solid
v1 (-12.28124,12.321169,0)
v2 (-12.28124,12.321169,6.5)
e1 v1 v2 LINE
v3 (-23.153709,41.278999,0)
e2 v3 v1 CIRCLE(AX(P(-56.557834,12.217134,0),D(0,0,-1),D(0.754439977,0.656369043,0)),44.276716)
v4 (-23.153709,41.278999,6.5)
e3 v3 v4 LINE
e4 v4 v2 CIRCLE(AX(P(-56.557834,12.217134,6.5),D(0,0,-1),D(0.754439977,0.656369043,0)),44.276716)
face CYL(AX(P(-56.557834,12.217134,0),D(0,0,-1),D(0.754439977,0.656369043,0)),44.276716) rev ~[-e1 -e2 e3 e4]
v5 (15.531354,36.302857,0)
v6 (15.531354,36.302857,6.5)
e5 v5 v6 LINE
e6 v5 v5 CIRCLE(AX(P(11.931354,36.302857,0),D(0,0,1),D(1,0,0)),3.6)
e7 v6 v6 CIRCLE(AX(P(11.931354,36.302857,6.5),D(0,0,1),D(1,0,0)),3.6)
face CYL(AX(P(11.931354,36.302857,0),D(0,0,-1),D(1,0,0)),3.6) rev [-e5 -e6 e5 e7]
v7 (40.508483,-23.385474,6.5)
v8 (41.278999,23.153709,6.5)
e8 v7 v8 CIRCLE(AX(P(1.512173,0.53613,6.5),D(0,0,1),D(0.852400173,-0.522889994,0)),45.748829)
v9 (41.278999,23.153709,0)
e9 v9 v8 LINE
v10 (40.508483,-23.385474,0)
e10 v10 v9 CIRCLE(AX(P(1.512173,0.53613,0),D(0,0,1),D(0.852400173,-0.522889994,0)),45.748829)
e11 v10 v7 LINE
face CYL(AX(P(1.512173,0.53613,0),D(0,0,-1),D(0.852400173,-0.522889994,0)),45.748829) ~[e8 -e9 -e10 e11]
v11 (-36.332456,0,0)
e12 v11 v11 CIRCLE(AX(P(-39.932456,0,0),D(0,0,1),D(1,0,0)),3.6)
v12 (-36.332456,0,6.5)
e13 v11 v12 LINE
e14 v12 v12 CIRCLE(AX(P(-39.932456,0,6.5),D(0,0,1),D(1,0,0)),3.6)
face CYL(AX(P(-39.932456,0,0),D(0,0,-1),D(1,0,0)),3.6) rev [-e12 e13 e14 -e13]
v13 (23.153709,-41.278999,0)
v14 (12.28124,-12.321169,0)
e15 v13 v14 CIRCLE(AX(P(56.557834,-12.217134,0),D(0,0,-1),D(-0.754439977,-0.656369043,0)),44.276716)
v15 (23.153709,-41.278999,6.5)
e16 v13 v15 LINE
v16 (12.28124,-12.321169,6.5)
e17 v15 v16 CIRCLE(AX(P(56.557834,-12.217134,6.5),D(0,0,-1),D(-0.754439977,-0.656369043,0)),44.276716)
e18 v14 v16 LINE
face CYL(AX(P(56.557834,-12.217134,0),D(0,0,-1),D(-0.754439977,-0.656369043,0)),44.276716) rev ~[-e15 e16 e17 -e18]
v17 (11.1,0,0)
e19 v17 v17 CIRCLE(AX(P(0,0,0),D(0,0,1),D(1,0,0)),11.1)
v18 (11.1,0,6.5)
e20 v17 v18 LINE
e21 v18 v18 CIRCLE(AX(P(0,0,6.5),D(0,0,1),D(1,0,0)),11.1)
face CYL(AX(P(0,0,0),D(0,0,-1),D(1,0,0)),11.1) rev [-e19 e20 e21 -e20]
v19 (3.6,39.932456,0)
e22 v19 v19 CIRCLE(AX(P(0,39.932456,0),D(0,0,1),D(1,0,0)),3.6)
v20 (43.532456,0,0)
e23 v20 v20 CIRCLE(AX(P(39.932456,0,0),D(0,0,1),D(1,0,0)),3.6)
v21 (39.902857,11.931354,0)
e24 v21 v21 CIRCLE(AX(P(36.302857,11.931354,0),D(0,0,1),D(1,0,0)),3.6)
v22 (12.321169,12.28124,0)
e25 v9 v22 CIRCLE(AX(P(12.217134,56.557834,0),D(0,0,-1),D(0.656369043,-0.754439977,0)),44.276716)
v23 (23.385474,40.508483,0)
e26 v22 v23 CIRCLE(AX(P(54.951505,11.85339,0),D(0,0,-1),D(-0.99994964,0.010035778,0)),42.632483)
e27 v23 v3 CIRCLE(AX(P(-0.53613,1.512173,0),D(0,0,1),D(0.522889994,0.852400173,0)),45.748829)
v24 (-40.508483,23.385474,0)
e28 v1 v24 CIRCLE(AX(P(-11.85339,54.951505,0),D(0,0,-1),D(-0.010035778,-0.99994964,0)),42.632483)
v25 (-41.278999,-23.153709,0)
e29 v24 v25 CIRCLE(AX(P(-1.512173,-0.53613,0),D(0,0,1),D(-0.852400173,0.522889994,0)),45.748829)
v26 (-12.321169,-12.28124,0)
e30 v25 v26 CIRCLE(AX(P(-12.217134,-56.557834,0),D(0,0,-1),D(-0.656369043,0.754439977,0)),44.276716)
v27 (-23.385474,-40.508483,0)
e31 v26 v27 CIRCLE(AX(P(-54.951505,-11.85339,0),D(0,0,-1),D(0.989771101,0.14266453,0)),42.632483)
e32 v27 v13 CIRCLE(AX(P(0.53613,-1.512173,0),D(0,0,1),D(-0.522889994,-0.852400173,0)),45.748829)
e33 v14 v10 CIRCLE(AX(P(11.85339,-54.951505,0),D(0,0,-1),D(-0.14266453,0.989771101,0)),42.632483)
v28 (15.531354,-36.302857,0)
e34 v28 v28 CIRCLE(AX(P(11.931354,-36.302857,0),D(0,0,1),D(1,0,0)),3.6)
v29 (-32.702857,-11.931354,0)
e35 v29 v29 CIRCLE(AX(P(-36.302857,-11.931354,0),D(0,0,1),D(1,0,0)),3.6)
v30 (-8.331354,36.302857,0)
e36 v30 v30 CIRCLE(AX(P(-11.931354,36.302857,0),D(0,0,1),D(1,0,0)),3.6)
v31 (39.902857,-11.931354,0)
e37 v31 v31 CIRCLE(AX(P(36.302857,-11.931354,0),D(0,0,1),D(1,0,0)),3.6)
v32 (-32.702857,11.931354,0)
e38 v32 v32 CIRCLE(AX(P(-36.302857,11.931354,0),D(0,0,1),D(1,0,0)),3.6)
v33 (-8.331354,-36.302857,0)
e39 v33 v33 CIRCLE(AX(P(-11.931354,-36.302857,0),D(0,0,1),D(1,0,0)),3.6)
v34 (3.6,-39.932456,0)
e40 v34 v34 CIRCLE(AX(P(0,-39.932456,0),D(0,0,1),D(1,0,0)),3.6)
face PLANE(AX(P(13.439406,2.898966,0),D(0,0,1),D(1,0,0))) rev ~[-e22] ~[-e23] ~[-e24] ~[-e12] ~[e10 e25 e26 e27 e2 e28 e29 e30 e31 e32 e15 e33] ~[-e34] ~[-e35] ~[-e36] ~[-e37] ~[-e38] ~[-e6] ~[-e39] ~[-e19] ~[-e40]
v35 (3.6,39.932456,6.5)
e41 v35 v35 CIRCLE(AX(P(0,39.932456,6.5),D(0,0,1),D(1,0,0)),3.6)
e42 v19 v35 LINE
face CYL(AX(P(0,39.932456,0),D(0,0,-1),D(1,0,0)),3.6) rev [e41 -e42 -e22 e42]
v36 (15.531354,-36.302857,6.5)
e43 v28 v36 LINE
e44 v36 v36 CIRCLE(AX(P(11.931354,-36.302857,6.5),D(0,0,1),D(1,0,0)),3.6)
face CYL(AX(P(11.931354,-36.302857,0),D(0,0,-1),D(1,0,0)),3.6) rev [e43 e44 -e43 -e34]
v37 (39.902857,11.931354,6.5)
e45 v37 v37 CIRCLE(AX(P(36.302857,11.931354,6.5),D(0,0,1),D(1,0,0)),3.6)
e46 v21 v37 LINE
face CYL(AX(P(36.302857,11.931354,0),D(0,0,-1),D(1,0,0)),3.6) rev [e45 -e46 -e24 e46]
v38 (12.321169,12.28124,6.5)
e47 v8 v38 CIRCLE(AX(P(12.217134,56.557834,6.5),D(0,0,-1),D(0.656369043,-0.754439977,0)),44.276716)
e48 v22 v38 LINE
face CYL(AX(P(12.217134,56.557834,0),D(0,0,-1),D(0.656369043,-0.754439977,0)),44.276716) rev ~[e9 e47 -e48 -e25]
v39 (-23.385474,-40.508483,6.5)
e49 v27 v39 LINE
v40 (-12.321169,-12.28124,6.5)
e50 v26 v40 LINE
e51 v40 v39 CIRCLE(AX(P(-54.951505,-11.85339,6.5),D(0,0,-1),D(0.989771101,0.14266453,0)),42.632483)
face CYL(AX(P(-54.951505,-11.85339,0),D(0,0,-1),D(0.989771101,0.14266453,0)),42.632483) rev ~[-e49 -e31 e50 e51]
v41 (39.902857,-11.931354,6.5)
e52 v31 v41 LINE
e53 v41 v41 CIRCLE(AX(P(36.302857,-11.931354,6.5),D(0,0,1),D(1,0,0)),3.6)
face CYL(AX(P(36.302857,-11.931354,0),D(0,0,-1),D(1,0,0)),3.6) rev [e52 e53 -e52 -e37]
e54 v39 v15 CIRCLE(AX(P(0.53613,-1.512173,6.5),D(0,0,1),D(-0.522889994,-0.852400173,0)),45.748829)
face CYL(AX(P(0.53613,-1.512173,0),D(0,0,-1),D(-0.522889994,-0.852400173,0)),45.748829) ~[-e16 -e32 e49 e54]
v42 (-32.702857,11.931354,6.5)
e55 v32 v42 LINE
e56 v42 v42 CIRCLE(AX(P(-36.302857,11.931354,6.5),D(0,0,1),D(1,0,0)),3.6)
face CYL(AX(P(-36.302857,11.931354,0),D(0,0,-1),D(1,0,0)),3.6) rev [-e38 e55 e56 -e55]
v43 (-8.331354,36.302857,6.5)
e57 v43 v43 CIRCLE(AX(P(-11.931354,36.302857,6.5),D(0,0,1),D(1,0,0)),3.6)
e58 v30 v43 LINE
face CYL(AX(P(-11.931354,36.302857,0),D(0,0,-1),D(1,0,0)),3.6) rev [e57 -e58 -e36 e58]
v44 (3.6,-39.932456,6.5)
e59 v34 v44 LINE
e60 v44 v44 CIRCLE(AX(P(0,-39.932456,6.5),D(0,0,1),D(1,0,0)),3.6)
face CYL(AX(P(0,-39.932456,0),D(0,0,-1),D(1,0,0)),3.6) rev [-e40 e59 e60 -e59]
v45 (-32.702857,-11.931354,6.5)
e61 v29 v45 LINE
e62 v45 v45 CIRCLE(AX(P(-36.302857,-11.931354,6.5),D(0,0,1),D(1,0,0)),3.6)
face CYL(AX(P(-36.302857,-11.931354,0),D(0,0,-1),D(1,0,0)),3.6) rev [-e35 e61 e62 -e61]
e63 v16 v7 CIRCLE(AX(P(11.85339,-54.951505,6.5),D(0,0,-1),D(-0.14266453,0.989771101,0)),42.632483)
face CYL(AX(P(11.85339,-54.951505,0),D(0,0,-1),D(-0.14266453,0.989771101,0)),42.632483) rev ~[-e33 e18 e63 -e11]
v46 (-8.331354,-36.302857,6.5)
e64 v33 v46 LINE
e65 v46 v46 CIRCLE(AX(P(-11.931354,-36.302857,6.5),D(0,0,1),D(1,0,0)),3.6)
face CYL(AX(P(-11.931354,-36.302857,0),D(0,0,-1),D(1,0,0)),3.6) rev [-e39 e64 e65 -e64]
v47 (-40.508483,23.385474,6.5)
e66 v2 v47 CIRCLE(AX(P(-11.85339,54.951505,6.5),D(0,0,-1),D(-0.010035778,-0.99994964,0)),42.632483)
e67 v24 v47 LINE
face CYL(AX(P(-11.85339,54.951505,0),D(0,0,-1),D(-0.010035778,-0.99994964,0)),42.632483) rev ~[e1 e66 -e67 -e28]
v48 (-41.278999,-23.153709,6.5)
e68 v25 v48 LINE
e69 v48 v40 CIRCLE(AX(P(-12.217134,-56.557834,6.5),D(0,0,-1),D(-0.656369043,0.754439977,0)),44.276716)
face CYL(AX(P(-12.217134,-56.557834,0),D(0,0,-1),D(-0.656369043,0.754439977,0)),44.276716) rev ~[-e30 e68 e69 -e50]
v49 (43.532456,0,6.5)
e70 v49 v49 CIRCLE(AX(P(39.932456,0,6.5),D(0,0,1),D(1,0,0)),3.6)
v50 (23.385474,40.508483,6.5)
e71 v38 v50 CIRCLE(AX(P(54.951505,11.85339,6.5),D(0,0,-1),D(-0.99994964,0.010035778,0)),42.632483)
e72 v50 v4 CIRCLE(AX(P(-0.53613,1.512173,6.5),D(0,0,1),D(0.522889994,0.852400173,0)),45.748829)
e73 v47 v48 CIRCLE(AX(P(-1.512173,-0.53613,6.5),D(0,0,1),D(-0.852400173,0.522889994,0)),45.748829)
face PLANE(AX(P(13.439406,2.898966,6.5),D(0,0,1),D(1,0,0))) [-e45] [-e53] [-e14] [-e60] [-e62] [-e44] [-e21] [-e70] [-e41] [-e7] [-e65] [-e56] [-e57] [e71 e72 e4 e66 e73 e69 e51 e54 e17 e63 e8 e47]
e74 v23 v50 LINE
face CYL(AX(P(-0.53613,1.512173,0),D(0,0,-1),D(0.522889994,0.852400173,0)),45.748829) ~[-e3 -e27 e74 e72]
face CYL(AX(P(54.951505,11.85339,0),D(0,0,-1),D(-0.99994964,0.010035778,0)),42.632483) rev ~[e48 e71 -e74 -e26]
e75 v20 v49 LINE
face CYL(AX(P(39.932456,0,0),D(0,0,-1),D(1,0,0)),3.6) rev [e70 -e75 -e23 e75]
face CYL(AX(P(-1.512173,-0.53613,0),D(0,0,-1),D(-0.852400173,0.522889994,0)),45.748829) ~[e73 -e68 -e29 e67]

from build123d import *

# Parameters (mm, degrees)
F0_R     = 3.6
F0_R_2   = 11.1
F1_DEPTH = 6.5


with BuildPart() as f1:
    # F0 (on Top) → F1 (new body)
    with BuildSketch(Plane.XY):
        with BuildLine():
            ThreePointArc((12.7551052803, 5.7712467707), (13.2775282625, 2.8640474895), (14, 0))
            ThreePointArc((14, 0), (13.6852379213, 2.951993062), (12.7551052803, 5.7712467707))
        make_face()
        with BuildLine():
            ThreePointArc((12.7551052803, 5.7712467707), (13.6852379213, 2.951993062), (14, 0))
            ThreePointArc((14, 0), (13.6843771554, -2.9559806947), (12.7517397332, -5.7786792415))
            ThreePointArc((12.7517397332, -5.7786792415), (12.3951684194, -9.0411992807), (12.2812401035, -12.3211688608))
            ThreePointArc((12.2812401035, -12.3211688608), (27.4116387343, -15.2593204889), (40.5084826052, -23.3854744583))
            ThreePointArc((40.5084826052, -23.3854744583), (47.2547330266, -0.2211970993), (41.2789992988, 23.1537092477))
            ThreePointArc((41.2789992988, 23.1537092477), (27.7803945414, 15.1065071257), (12.3211688608, 12.2812401035))
            ThreePointArc((12.3211688608, 12.2812401035), (12.4134187433, 9.0179300915), (12.7551052803, 5.7712467707))
        make_face()
        with Locations((36.3028572677, -11.9313535626)):
            Circle(F0_R, mode=Mode.SUBTRACT)
        with Locations((39.9324558712, 0)):
            Circle(F0_R, mode=Mode.SUBTRACT)
        with Locations((36.3028572677, 11.9313535626)):
            Circle(F0_R, mode=Mode.SUBTRACT)
        with BuildLine():
            ThreePointArc((12.7517397332, -5.7786792415), (13.2793138092, -2.8684824171), (14, 0))
            ThreePointArc((14, 0), (13.2775282625, 2.8640474895), (12.7551052803, 5.7712467707))
            ThreePointArc((12.7551052803, 5.7712467707), (9.9023791422, 9.8966098905), (5.7786792415, 12.7517397332))
            ThreePointArc((5.7786792415, 12.7517397332), (2.8684824171, 13.2793138092), (0, 14))
            ThreePointArc((0, 14), (-2.8640474895, 13.2775282625), (-5.7712467707, 12.7551052803))
            ThreePointArc((-5.7712467707, 12.7551052803), (-9.8966098905, 9.9023791422), (-12.7517397332, 5.7786792415))
            ThreePointArc((-12.7517397332, 5.7786792415), (-13.2793138092, 2.8684824171), (-14, 0))
            ThreePointArc((-14, 0), (-13.2775282625, -2.8640474895), (-12.7551052803, -5.7712467707))
            ThreePointArc((-12.7551052803, -5.7712467707), (-9.9023791422, -9.8966098905), (-5.7786792415, -12.7517397332))
            ThreePointArc((-5.7786792415, -12.7517397332), (-2.8684824171, -13.2793138092), (0, -14))
            ThreePointArc((0, -14), (2.8640474895, -13.2775282625), (5.7712467707, -12.7551052803))
            ThreePointArc((5.7712467707, -12.7551052803), (9.8966098905, -9.9023791422), (12.7517397332, -5.7786792415))
        make_face()
        Circle(F0_R_2, mode=Mode.SUBTRACT)
        with BuildLine():
            ThreePointArc((12.7517397332, -5.7786792415), (13.6843771554, -2.9559806947), (14, 0))
            ThreePointArc((14, 0), (13.2793138092, -2.8684824171), (12.7517397332, -5.7786792415))
        make_face()
        with BuildLine():
            ThreePointArc((5.7786792415, 12.7517397332), (9.9023791422, 9.8966098905), (12.7551052803, 5.7712467707))
            ThreePointArc((12.7551052803, 5.7712467707), (12.4134187433, 9.0179300915), (12.3211688608, 12.2812401035))
            ThreePointArc((12.3211688608, 12.2812401035), (9.0411992807, 12.3951684194), (5.7786792415, 12.7517397332))
        make_face()
        with BuildLine():
            ThreePointArc((12.2812401035, -12.3211688608), (12.3951684194, -9.0411992807), (12.7517397332, -5.7786792415))
            ThreePointArc((12.7517397332, -5.7786792415), (9.8966098905, -9.9023791422), (5.7712467707, -12.7551052803))
            ThreePointArc((5.7712467707, -12.7551052803), (9.0179300915, -12.4134187433), (12.2812401035, -12.3211688608))
        make_face()
        with BuildLine():
            ThreePointArc((0, 14), (2.8684824171, 13.2793138092), (5.7786792415, 12.7517397332))
            ThreePointArc((5.7786792415, 12.7517397332), (2.9559806947, 13.6843771554), (0, 14))
        make_face()
        with BuildLine():
            ThreePointArc((0, 14), (2.9559806947, 13.6843771554), (5.7786792415, 12.7517397332))
            ThreePointArc((5.7786792415, 12.7517397332), (9.0411992807, 12.3951684194), (12.3211688608, 12.2812401035))
            ThreePointArc((12.3211688608, 12.2812401035), (15.2593204889, 27.4116387343), (23.3854744583, 40.5084826052))
            ThreePointArc((23.3854744583, 40.5084826052), (0.2211970993, 47.2547330266), (-23.1537092477, 41.2789992988))
            ThreePointArc((-23.1537092477, 41.2789992988), (-15.1065071257, 27.7803945414), (-12.2812401035, 12.3211688608))
            ThreePointArc((-12.2812401035, 12.3211688608), (-9.0179300915, 12.4134187433), (-5.7712467707, 12.7551052803))
            ThreePointArc((-5.7712467707, 12.7551052803), (-2.951993062, 13.6852379213), (0, 14))
        make_face()
        with Locations((-11.9313535626, 36.3028572677)):
            Circle(F0_R, mode=Mode.SUBTRACT)
        with Locations((0, 39.9324558712)):
            Circle(F0_R, mode=Mode.SUBTRACT)
        with Locations((11.9313535626, 36.3028572677)):
            Circle(F0_R, mode=Mode.SUBTRACT)
        with BuildLine():
            ThreePointArc((12.2812401035, -12.3211688608), (9.0179300915, -12.4134187433), (5.7712467707, -12.7551052803))
            ThreePointArc((5.7712467707, -12.7551052803), (2.951993062, -13.6852379213), (0, -14))
            ThreePointArc((0, -14), (-2.9559806947, -13.6843771554), (-5.7786792415, -12.7517397332))
            ThreePointArc((-5.7786792415, -12.7517397332), (-9.0411992807, -12.3951684194), (-12.3211688608, -12.2812401035))
            ThreePointArc((-12.3211688608, -12.2812401035), (-15.2593204889, -27.4116387343), (-23.3854744583, -40.5084826052))
            ThreePointArc((-23.3854744583, -40.5084826052), (-0.2211970993, -47.2547330266), (23.1537092477, -41.2789992988))
            ThreePointArc((23.1537092477, -41.2789992988), (15.1065071257, -27.7803945414), (12.2812401035, -12.3211688608))
        make_face()
        with Locations((-11.9313535626, -36.3028572677)):
            Circle(F0_R, mode=Mode.SUBTRACT)
        with Locations((0, -39.9324558712)):
            Circle(F0_R, mode=Mode.SUBTRACT)
        with Locations((11.9313535626, -36.3028572677)):
            Circle(F0_R, mode=Mode.SUBTRACT)
        with BuildLine():
            ThreePointArc((0, -14), (2.951993062, -13.6852379213), (5.7712467707, -12.7551052803))
            ThreePointArc((5.7712467707, -12.7551052803), (2.8640474895, -13.2775282625), (0, -14))
        make_face()
        with BuildLine():
            ThreePointArc((-5.7712467707, 12.7551052803), (-2.8640474895, 13.2775282625), (0, 14))
            ThreePointArc((0, 14), (-2.951993062, 13.6852379213), (-5.7712467707, 12.7551052803))
        make_face()
        with BuildLine():
            ThreePointArc((-5.7786792415, -12.7517397332), (-2.9559806947, -13.6843771554), (0, -14))
            ThreePointArc((0, -14), (-2.8684824171, -13.2793138092), (-5.7786792415, -12.7517397332))
        make_face()
        with BuildLine():
            ThreePointArc((-12.7517397332, 5.7786792415), (-9.8966098905, 9.9023791422), (-5.7712467707, 12.7551052803))
            ThreePointArc((-5.7712467707, 12.7551052803), (-9.0179300915, 12.4134187433), (-12.2812401035, 12.3211688608))
            ThreePointArc((-12.2812401035, 12.3211688608), (-12.3951684194, 9.0411992807), (-12.7517397332, 5.7786792415))
        make_face()
        with BuildLine():
            ThreePointArc((-12.3211688608, -12.2812401035), (-9.0411992807, -12.3951684194), (-5.7786792415, -12.7517397332))
            ThreePointArc((-5.7786792415, -12.7517397332), (-9.9023791422, -9.8966098905), (-12.7551052803, -5.7712467707))
            ThreePointArc((-12.7551052803, -5.7712467707), (-12.4134187433, -9.0179300915), (-12.3211688608, -12.2812401035))
        make_face()
        with BuildLine():
            ThreePointArc((-14, 0), (-13.2793138092, 2.8684824171), (-12.7517397332, 5.7786792415))
            ThreePointArc((-12.7517397332, 5.7786792415), (-13.6843771554, 2.9559806947), (-14, 0))
        make_face()
        with BuildLine():
            ThreePointArc((-14, 0), (-13.6843771554, 2.9559806947), (-12.7517397332, 5.7786792415))
            ThreePointArc((-12.7517397332, 5.7786792415), (-12.3951684194, 9.0411992807), (-12.2812401035, 12.3211688608))
            ThreePointArc((-12.2812401035, 12.3211688608), (-27.4116387343, 15.2593204889), (-40.5084826052, 23.3854744583))
            ThreePointArc((-40.5084826052, 23.3854744583), (-47.2547330266, 0.2211970993), (-41.2789992988, -23.1537092477))
            ThreePointArc((-41.2789992988, -23.1537092477), (-27.7803945414, -15.1065071257), (-12.3211688608, -12.2812401035))
            ThreePointArc((-12.3211688608, -12.2812401035), (-12.4134187433, -9.0179300915), (-12.7551052803, -5.7712467707))
            ThreePointArc((-12.7551052803, -5.7712467707), (-13.6852379213, -2.951993062), (-14, 0))
        make_face()
        with Locations((-36.3028572677, -11.9313535626)):
            Circle(F0_R, mode=Mode.SUBTRACT)
        with Locations((-39.9324558712, 0)):
            Circle(F0_R, mode=Mode.SUBTRACT)
        with Locations((-36.3028572677, 11.9313535626)):
            Circle(F0_R, mode=Mode.SUBTRACT)
        with BuildLine():
            ThreePointArc((-14, 0), (-13.6852379213, -2.951993062), (-12.7551052803, -5.7712467707))
            ThreePointArc((-12.7551052803, -5.7712467707), (-13.2775282625, -2.8640474895), (-14, 0))
        make_face()
    extrude(amount=F1_DEPTH)


solid = f1.part
